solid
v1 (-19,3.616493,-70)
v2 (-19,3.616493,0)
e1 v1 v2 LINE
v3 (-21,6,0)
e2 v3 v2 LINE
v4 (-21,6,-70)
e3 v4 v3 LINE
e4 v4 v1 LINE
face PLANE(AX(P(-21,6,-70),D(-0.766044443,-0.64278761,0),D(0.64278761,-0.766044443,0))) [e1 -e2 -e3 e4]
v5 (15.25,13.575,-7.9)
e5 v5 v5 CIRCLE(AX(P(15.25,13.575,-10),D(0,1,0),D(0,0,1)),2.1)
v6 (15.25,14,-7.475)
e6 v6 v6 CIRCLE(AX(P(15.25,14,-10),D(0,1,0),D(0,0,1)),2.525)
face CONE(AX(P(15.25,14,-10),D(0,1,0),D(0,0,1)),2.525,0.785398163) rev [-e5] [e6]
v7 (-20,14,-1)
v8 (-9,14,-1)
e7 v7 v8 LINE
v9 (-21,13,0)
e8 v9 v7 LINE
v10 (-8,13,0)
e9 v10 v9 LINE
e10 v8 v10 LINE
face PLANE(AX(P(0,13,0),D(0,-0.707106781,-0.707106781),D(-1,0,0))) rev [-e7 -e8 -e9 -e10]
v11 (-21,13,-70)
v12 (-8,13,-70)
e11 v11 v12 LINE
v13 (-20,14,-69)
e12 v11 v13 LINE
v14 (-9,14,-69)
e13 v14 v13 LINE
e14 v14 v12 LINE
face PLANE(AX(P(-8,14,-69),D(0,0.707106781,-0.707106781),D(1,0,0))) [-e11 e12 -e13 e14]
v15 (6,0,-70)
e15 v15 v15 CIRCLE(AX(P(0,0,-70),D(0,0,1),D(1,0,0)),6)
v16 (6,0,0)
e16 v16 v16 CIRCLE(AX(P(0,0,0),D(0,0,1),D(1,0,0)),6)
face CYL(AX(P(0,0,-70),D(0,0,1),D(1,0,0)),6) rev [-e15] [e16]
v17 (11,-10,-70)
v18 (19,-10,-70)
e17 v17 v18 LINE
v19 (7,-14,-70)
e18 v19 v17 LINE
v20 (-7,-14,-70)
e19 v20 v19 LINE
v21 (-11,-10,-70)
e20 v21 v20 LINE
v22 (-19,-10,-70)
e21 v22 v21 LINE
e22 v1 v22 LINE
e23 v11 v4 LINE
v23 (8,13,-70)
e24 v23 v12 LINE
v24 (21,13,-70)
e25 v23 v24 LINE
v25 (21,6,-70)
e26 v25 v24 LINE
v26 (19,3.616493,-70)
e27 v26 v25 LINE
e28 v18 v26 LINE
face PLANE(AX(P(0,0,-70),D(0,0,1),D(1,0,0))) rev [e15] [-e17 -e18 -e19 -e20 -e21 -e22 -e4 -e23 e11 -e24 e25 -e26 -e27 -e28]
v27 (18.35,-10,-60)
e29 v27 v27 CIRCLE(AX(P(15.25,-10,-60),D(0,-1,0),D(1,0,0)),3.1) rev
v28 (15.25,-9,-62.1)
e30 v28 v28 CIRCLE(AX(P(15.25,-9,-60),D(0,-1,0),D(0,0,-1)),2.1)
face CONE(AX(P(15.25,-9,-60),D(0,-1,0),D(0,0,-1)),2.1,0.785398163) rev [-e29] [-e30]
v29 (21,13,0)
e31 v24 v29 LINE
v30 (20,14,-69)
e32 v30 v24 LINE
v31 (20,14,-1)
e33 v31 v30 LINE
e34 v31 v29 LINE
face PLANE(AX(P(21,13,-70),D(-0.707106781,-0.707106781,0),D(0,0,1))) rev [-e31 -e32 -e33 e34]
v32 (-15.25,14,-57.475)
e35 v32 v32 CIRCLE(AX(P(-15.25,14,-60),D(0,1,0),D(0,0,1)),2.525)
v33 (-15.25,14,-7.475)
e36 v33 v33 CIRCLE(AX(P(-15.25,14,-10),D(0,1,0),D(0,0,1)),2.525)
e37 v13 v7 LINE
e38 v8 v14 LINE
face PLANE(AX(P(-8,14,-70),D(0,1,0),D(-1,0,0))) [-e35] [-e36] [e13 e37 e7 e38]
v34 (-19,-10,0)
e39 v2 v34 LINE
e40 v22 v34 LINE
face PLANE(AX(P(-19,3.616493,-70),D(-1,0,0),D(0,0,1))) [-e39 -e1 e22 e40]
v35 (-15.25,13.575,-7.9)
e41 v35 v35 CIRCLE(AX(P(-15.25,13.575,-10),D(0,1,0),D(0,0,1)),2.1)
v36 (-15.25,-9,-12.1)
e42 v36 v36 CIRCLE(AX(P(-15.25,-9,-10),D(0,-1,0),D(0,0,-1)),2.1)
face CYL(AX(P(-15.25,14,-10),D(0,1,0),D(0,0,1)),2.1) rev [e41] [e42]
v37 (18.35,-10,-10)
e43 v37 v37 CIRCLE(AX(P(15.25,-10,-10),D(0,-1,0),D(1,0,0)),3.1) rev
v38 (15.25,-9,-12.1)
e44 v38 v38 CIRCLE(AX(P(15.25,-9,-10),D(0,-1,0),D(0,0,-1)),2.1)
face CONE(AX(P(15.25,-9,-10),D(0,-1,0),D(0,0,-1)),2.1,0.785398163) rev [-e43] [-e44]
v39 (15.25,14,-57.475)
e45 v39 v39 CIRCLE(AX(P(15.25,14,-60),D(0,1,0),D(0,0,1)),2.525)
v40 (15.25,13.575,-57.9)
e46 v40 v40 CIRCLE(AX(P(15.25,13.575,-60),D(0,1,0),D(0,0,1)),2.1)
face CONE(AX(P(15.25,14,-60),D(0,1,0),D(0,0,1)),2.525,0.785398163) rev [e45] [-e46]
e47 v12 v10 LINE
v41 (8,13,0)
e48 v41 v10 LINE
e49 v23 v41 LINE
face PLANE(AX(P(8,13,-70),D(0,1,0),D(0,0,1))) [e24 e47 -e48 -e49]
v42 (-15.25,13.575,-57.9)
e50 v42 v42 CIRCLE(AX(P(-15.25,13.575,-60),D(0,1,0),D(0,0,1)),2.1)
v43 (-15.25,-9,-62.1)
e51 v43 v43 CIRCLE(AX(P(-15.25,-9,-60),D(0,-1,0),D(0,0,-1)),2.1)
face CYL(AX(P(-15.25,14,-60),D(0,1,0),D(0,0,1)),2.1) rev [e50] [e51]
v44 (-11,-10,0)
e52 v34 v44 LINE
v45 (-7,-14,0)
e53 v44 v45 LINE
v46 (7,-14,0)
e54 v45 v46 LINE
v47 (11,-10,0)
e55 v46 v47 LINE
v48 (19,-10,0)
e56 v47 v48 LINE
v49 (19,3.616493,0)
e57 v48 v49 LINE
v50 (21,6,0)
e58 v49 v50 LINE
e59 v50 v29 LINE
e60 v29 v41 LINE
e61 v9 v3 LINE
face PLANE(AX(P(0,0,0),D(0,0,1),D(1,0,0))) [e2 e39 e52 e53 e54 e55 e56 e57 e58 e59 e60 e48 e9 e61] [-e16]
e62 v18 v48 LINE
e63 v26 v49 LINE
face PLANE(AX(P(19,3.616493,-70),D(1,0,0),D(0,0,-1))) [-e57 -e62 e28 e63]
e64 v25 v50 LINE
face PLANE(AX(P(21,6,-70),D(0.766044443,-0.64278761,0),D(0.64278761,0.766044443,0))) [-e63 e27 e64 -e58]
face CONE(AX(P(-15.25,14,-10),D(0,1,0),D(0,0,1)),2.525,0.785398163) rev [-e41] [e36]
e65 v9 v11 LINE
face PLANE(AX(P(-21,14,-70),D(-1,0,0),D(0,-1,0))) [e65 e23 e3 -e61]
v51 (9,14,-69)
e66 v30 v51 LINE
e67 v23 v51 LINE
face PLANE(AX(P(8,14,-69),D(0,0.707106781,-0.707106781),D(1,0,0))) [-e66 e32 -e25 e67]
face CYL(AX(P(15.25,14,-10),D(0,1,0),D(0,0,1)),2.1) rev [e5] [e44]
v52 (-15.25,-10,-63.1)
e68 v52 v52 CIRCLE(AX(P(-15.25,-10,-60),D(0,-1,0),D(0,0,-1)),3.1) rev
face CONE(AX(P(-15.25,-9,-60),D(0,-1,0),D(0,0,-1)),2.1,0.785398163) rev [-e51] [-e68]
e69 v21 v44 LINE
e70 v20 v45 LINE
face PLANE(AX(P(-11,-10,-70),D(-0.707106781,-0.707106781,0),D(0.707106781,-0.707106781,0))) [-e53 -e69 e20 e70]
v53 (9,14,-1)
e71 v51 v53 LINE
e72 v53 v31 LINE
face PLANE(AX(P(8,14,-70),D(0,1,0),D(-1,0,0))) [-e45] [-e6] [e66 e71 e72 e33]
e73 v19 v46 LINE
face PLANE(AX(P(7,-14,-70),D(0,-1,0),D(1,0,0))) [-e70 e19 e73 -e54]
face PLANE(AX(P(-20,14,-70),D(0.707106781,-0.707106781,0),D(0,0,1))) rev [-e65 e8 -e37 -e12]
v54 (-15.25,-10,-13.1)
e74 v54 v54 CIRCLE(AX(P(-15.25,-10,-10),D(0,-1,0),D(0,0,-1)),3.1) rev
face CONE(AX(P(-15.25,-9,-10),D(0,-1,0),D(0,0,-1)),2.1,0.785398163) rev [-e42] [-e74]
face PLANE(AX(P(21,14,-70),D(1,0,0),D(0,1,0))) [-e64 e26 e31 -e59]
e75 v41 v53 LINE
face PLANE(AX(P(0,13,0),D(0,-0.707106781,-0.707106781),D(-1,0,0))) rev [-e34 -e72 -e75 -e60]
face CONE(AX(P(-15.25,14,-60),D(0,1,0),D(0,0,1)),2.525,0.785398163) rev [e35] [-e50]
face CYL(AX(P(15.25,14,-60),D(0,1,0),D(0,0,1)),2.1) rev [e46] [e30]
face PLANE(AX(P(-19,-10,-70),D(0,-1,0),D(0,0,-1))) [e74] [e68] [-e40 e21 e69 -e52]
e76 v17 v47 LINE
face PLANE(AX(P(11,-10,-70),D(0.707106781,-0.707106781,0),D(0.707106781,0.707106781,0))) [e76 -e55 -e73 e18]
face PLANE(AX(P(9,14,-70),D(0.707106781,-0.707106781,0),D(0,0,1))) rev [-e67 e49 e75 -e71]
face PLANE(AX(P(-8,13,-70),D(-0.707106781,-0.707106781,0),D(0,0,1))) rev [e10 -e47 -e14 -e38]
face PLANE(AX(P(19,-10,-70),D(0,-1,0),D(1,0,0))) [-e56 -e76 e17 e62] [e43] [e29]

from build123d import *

# Parameters (mm, degrees)
ESBO_O1_R                       = 6
RESSALTO_EXTRUS_O1_DEPTH        = 70
CHANFRO1_SIZE                   = 1
FURO_ROSCADO_DE_M51_D           = 4.2
FURO_ROSCADO_DE_M51_CSINK_D     = 5.05
FURO_ROSCADO_DE_M51_CSINK_ANGLE = 90
CHANFRO2_SIZE                   = 1


with BuildPart() as part:
    # Esboço1 → Ressalto-extrusão1 (new body)
    with BuildSketch(Plane.XY):
        Polygon((8, 13), (-8, 13), (-8, 14), (-21, 14), (-21, 6), (-19, 3.616492815), (-19, -10), (-11, -10), (-7, -14), (7, -14), (11, -10), (19, -10), (19, 3.616492815), (21, 6), (21, 14), (8, 14), align=None)
        Circle(ESBO_O1_R, mode=Mode.SUBTRACT)
    extrude(amount=-RESSALTO_EXTRUS_O1_DEPTH)

    # Chanfro1
    chanfro1_edges = [part.edges().sort_by_distance(p)[0] for p in [
        (14.5, 14, -70),
        (21, 14, -35),
        (14.5, 14, 0),
        (8, 14, -35),
        (-14.5, 14, -70),
        (-21, 14, -35),
        (-14.5, 14, 0),
        (-8, 14, -35),
    ]]
    chamfer(chanfro1_edges, length=CHANFRO1_SIZE - 0.0001)  # a hair under: the kernel refuses the full size

    # Furo roscado de M51 (through all)
    with Locations(Plane(origin=(0, 14, 0), x_dir=(1, 0, 0), z_dir=(0, 1, 0))):
        with Locations((15.25, 10), (15.25, 60), (-15.25, 60), (-15.25, 10)):
            CounterSinkHole(FURO_ROSCADO_DE_M51_D / 2, FURO_ROSCADO_DE_M51_CSINK_D / 2, counter_sink_angle=FURO_ROSCADO_DE_M51_CSINK_ANGLE)

    # Chanfro2
    chanfro2_edges = [part.edges().sort_by_distance(p)[0] for p in [
        (-13.15, -10, -10),
        (-13.15, -10, -60),
        (17.35, -10, -60),
        (17.35, -10, -10),
    ]]
    chamfer(chanfro2_edges, length=CHANFRO2_SIZE)


solid = part.part
